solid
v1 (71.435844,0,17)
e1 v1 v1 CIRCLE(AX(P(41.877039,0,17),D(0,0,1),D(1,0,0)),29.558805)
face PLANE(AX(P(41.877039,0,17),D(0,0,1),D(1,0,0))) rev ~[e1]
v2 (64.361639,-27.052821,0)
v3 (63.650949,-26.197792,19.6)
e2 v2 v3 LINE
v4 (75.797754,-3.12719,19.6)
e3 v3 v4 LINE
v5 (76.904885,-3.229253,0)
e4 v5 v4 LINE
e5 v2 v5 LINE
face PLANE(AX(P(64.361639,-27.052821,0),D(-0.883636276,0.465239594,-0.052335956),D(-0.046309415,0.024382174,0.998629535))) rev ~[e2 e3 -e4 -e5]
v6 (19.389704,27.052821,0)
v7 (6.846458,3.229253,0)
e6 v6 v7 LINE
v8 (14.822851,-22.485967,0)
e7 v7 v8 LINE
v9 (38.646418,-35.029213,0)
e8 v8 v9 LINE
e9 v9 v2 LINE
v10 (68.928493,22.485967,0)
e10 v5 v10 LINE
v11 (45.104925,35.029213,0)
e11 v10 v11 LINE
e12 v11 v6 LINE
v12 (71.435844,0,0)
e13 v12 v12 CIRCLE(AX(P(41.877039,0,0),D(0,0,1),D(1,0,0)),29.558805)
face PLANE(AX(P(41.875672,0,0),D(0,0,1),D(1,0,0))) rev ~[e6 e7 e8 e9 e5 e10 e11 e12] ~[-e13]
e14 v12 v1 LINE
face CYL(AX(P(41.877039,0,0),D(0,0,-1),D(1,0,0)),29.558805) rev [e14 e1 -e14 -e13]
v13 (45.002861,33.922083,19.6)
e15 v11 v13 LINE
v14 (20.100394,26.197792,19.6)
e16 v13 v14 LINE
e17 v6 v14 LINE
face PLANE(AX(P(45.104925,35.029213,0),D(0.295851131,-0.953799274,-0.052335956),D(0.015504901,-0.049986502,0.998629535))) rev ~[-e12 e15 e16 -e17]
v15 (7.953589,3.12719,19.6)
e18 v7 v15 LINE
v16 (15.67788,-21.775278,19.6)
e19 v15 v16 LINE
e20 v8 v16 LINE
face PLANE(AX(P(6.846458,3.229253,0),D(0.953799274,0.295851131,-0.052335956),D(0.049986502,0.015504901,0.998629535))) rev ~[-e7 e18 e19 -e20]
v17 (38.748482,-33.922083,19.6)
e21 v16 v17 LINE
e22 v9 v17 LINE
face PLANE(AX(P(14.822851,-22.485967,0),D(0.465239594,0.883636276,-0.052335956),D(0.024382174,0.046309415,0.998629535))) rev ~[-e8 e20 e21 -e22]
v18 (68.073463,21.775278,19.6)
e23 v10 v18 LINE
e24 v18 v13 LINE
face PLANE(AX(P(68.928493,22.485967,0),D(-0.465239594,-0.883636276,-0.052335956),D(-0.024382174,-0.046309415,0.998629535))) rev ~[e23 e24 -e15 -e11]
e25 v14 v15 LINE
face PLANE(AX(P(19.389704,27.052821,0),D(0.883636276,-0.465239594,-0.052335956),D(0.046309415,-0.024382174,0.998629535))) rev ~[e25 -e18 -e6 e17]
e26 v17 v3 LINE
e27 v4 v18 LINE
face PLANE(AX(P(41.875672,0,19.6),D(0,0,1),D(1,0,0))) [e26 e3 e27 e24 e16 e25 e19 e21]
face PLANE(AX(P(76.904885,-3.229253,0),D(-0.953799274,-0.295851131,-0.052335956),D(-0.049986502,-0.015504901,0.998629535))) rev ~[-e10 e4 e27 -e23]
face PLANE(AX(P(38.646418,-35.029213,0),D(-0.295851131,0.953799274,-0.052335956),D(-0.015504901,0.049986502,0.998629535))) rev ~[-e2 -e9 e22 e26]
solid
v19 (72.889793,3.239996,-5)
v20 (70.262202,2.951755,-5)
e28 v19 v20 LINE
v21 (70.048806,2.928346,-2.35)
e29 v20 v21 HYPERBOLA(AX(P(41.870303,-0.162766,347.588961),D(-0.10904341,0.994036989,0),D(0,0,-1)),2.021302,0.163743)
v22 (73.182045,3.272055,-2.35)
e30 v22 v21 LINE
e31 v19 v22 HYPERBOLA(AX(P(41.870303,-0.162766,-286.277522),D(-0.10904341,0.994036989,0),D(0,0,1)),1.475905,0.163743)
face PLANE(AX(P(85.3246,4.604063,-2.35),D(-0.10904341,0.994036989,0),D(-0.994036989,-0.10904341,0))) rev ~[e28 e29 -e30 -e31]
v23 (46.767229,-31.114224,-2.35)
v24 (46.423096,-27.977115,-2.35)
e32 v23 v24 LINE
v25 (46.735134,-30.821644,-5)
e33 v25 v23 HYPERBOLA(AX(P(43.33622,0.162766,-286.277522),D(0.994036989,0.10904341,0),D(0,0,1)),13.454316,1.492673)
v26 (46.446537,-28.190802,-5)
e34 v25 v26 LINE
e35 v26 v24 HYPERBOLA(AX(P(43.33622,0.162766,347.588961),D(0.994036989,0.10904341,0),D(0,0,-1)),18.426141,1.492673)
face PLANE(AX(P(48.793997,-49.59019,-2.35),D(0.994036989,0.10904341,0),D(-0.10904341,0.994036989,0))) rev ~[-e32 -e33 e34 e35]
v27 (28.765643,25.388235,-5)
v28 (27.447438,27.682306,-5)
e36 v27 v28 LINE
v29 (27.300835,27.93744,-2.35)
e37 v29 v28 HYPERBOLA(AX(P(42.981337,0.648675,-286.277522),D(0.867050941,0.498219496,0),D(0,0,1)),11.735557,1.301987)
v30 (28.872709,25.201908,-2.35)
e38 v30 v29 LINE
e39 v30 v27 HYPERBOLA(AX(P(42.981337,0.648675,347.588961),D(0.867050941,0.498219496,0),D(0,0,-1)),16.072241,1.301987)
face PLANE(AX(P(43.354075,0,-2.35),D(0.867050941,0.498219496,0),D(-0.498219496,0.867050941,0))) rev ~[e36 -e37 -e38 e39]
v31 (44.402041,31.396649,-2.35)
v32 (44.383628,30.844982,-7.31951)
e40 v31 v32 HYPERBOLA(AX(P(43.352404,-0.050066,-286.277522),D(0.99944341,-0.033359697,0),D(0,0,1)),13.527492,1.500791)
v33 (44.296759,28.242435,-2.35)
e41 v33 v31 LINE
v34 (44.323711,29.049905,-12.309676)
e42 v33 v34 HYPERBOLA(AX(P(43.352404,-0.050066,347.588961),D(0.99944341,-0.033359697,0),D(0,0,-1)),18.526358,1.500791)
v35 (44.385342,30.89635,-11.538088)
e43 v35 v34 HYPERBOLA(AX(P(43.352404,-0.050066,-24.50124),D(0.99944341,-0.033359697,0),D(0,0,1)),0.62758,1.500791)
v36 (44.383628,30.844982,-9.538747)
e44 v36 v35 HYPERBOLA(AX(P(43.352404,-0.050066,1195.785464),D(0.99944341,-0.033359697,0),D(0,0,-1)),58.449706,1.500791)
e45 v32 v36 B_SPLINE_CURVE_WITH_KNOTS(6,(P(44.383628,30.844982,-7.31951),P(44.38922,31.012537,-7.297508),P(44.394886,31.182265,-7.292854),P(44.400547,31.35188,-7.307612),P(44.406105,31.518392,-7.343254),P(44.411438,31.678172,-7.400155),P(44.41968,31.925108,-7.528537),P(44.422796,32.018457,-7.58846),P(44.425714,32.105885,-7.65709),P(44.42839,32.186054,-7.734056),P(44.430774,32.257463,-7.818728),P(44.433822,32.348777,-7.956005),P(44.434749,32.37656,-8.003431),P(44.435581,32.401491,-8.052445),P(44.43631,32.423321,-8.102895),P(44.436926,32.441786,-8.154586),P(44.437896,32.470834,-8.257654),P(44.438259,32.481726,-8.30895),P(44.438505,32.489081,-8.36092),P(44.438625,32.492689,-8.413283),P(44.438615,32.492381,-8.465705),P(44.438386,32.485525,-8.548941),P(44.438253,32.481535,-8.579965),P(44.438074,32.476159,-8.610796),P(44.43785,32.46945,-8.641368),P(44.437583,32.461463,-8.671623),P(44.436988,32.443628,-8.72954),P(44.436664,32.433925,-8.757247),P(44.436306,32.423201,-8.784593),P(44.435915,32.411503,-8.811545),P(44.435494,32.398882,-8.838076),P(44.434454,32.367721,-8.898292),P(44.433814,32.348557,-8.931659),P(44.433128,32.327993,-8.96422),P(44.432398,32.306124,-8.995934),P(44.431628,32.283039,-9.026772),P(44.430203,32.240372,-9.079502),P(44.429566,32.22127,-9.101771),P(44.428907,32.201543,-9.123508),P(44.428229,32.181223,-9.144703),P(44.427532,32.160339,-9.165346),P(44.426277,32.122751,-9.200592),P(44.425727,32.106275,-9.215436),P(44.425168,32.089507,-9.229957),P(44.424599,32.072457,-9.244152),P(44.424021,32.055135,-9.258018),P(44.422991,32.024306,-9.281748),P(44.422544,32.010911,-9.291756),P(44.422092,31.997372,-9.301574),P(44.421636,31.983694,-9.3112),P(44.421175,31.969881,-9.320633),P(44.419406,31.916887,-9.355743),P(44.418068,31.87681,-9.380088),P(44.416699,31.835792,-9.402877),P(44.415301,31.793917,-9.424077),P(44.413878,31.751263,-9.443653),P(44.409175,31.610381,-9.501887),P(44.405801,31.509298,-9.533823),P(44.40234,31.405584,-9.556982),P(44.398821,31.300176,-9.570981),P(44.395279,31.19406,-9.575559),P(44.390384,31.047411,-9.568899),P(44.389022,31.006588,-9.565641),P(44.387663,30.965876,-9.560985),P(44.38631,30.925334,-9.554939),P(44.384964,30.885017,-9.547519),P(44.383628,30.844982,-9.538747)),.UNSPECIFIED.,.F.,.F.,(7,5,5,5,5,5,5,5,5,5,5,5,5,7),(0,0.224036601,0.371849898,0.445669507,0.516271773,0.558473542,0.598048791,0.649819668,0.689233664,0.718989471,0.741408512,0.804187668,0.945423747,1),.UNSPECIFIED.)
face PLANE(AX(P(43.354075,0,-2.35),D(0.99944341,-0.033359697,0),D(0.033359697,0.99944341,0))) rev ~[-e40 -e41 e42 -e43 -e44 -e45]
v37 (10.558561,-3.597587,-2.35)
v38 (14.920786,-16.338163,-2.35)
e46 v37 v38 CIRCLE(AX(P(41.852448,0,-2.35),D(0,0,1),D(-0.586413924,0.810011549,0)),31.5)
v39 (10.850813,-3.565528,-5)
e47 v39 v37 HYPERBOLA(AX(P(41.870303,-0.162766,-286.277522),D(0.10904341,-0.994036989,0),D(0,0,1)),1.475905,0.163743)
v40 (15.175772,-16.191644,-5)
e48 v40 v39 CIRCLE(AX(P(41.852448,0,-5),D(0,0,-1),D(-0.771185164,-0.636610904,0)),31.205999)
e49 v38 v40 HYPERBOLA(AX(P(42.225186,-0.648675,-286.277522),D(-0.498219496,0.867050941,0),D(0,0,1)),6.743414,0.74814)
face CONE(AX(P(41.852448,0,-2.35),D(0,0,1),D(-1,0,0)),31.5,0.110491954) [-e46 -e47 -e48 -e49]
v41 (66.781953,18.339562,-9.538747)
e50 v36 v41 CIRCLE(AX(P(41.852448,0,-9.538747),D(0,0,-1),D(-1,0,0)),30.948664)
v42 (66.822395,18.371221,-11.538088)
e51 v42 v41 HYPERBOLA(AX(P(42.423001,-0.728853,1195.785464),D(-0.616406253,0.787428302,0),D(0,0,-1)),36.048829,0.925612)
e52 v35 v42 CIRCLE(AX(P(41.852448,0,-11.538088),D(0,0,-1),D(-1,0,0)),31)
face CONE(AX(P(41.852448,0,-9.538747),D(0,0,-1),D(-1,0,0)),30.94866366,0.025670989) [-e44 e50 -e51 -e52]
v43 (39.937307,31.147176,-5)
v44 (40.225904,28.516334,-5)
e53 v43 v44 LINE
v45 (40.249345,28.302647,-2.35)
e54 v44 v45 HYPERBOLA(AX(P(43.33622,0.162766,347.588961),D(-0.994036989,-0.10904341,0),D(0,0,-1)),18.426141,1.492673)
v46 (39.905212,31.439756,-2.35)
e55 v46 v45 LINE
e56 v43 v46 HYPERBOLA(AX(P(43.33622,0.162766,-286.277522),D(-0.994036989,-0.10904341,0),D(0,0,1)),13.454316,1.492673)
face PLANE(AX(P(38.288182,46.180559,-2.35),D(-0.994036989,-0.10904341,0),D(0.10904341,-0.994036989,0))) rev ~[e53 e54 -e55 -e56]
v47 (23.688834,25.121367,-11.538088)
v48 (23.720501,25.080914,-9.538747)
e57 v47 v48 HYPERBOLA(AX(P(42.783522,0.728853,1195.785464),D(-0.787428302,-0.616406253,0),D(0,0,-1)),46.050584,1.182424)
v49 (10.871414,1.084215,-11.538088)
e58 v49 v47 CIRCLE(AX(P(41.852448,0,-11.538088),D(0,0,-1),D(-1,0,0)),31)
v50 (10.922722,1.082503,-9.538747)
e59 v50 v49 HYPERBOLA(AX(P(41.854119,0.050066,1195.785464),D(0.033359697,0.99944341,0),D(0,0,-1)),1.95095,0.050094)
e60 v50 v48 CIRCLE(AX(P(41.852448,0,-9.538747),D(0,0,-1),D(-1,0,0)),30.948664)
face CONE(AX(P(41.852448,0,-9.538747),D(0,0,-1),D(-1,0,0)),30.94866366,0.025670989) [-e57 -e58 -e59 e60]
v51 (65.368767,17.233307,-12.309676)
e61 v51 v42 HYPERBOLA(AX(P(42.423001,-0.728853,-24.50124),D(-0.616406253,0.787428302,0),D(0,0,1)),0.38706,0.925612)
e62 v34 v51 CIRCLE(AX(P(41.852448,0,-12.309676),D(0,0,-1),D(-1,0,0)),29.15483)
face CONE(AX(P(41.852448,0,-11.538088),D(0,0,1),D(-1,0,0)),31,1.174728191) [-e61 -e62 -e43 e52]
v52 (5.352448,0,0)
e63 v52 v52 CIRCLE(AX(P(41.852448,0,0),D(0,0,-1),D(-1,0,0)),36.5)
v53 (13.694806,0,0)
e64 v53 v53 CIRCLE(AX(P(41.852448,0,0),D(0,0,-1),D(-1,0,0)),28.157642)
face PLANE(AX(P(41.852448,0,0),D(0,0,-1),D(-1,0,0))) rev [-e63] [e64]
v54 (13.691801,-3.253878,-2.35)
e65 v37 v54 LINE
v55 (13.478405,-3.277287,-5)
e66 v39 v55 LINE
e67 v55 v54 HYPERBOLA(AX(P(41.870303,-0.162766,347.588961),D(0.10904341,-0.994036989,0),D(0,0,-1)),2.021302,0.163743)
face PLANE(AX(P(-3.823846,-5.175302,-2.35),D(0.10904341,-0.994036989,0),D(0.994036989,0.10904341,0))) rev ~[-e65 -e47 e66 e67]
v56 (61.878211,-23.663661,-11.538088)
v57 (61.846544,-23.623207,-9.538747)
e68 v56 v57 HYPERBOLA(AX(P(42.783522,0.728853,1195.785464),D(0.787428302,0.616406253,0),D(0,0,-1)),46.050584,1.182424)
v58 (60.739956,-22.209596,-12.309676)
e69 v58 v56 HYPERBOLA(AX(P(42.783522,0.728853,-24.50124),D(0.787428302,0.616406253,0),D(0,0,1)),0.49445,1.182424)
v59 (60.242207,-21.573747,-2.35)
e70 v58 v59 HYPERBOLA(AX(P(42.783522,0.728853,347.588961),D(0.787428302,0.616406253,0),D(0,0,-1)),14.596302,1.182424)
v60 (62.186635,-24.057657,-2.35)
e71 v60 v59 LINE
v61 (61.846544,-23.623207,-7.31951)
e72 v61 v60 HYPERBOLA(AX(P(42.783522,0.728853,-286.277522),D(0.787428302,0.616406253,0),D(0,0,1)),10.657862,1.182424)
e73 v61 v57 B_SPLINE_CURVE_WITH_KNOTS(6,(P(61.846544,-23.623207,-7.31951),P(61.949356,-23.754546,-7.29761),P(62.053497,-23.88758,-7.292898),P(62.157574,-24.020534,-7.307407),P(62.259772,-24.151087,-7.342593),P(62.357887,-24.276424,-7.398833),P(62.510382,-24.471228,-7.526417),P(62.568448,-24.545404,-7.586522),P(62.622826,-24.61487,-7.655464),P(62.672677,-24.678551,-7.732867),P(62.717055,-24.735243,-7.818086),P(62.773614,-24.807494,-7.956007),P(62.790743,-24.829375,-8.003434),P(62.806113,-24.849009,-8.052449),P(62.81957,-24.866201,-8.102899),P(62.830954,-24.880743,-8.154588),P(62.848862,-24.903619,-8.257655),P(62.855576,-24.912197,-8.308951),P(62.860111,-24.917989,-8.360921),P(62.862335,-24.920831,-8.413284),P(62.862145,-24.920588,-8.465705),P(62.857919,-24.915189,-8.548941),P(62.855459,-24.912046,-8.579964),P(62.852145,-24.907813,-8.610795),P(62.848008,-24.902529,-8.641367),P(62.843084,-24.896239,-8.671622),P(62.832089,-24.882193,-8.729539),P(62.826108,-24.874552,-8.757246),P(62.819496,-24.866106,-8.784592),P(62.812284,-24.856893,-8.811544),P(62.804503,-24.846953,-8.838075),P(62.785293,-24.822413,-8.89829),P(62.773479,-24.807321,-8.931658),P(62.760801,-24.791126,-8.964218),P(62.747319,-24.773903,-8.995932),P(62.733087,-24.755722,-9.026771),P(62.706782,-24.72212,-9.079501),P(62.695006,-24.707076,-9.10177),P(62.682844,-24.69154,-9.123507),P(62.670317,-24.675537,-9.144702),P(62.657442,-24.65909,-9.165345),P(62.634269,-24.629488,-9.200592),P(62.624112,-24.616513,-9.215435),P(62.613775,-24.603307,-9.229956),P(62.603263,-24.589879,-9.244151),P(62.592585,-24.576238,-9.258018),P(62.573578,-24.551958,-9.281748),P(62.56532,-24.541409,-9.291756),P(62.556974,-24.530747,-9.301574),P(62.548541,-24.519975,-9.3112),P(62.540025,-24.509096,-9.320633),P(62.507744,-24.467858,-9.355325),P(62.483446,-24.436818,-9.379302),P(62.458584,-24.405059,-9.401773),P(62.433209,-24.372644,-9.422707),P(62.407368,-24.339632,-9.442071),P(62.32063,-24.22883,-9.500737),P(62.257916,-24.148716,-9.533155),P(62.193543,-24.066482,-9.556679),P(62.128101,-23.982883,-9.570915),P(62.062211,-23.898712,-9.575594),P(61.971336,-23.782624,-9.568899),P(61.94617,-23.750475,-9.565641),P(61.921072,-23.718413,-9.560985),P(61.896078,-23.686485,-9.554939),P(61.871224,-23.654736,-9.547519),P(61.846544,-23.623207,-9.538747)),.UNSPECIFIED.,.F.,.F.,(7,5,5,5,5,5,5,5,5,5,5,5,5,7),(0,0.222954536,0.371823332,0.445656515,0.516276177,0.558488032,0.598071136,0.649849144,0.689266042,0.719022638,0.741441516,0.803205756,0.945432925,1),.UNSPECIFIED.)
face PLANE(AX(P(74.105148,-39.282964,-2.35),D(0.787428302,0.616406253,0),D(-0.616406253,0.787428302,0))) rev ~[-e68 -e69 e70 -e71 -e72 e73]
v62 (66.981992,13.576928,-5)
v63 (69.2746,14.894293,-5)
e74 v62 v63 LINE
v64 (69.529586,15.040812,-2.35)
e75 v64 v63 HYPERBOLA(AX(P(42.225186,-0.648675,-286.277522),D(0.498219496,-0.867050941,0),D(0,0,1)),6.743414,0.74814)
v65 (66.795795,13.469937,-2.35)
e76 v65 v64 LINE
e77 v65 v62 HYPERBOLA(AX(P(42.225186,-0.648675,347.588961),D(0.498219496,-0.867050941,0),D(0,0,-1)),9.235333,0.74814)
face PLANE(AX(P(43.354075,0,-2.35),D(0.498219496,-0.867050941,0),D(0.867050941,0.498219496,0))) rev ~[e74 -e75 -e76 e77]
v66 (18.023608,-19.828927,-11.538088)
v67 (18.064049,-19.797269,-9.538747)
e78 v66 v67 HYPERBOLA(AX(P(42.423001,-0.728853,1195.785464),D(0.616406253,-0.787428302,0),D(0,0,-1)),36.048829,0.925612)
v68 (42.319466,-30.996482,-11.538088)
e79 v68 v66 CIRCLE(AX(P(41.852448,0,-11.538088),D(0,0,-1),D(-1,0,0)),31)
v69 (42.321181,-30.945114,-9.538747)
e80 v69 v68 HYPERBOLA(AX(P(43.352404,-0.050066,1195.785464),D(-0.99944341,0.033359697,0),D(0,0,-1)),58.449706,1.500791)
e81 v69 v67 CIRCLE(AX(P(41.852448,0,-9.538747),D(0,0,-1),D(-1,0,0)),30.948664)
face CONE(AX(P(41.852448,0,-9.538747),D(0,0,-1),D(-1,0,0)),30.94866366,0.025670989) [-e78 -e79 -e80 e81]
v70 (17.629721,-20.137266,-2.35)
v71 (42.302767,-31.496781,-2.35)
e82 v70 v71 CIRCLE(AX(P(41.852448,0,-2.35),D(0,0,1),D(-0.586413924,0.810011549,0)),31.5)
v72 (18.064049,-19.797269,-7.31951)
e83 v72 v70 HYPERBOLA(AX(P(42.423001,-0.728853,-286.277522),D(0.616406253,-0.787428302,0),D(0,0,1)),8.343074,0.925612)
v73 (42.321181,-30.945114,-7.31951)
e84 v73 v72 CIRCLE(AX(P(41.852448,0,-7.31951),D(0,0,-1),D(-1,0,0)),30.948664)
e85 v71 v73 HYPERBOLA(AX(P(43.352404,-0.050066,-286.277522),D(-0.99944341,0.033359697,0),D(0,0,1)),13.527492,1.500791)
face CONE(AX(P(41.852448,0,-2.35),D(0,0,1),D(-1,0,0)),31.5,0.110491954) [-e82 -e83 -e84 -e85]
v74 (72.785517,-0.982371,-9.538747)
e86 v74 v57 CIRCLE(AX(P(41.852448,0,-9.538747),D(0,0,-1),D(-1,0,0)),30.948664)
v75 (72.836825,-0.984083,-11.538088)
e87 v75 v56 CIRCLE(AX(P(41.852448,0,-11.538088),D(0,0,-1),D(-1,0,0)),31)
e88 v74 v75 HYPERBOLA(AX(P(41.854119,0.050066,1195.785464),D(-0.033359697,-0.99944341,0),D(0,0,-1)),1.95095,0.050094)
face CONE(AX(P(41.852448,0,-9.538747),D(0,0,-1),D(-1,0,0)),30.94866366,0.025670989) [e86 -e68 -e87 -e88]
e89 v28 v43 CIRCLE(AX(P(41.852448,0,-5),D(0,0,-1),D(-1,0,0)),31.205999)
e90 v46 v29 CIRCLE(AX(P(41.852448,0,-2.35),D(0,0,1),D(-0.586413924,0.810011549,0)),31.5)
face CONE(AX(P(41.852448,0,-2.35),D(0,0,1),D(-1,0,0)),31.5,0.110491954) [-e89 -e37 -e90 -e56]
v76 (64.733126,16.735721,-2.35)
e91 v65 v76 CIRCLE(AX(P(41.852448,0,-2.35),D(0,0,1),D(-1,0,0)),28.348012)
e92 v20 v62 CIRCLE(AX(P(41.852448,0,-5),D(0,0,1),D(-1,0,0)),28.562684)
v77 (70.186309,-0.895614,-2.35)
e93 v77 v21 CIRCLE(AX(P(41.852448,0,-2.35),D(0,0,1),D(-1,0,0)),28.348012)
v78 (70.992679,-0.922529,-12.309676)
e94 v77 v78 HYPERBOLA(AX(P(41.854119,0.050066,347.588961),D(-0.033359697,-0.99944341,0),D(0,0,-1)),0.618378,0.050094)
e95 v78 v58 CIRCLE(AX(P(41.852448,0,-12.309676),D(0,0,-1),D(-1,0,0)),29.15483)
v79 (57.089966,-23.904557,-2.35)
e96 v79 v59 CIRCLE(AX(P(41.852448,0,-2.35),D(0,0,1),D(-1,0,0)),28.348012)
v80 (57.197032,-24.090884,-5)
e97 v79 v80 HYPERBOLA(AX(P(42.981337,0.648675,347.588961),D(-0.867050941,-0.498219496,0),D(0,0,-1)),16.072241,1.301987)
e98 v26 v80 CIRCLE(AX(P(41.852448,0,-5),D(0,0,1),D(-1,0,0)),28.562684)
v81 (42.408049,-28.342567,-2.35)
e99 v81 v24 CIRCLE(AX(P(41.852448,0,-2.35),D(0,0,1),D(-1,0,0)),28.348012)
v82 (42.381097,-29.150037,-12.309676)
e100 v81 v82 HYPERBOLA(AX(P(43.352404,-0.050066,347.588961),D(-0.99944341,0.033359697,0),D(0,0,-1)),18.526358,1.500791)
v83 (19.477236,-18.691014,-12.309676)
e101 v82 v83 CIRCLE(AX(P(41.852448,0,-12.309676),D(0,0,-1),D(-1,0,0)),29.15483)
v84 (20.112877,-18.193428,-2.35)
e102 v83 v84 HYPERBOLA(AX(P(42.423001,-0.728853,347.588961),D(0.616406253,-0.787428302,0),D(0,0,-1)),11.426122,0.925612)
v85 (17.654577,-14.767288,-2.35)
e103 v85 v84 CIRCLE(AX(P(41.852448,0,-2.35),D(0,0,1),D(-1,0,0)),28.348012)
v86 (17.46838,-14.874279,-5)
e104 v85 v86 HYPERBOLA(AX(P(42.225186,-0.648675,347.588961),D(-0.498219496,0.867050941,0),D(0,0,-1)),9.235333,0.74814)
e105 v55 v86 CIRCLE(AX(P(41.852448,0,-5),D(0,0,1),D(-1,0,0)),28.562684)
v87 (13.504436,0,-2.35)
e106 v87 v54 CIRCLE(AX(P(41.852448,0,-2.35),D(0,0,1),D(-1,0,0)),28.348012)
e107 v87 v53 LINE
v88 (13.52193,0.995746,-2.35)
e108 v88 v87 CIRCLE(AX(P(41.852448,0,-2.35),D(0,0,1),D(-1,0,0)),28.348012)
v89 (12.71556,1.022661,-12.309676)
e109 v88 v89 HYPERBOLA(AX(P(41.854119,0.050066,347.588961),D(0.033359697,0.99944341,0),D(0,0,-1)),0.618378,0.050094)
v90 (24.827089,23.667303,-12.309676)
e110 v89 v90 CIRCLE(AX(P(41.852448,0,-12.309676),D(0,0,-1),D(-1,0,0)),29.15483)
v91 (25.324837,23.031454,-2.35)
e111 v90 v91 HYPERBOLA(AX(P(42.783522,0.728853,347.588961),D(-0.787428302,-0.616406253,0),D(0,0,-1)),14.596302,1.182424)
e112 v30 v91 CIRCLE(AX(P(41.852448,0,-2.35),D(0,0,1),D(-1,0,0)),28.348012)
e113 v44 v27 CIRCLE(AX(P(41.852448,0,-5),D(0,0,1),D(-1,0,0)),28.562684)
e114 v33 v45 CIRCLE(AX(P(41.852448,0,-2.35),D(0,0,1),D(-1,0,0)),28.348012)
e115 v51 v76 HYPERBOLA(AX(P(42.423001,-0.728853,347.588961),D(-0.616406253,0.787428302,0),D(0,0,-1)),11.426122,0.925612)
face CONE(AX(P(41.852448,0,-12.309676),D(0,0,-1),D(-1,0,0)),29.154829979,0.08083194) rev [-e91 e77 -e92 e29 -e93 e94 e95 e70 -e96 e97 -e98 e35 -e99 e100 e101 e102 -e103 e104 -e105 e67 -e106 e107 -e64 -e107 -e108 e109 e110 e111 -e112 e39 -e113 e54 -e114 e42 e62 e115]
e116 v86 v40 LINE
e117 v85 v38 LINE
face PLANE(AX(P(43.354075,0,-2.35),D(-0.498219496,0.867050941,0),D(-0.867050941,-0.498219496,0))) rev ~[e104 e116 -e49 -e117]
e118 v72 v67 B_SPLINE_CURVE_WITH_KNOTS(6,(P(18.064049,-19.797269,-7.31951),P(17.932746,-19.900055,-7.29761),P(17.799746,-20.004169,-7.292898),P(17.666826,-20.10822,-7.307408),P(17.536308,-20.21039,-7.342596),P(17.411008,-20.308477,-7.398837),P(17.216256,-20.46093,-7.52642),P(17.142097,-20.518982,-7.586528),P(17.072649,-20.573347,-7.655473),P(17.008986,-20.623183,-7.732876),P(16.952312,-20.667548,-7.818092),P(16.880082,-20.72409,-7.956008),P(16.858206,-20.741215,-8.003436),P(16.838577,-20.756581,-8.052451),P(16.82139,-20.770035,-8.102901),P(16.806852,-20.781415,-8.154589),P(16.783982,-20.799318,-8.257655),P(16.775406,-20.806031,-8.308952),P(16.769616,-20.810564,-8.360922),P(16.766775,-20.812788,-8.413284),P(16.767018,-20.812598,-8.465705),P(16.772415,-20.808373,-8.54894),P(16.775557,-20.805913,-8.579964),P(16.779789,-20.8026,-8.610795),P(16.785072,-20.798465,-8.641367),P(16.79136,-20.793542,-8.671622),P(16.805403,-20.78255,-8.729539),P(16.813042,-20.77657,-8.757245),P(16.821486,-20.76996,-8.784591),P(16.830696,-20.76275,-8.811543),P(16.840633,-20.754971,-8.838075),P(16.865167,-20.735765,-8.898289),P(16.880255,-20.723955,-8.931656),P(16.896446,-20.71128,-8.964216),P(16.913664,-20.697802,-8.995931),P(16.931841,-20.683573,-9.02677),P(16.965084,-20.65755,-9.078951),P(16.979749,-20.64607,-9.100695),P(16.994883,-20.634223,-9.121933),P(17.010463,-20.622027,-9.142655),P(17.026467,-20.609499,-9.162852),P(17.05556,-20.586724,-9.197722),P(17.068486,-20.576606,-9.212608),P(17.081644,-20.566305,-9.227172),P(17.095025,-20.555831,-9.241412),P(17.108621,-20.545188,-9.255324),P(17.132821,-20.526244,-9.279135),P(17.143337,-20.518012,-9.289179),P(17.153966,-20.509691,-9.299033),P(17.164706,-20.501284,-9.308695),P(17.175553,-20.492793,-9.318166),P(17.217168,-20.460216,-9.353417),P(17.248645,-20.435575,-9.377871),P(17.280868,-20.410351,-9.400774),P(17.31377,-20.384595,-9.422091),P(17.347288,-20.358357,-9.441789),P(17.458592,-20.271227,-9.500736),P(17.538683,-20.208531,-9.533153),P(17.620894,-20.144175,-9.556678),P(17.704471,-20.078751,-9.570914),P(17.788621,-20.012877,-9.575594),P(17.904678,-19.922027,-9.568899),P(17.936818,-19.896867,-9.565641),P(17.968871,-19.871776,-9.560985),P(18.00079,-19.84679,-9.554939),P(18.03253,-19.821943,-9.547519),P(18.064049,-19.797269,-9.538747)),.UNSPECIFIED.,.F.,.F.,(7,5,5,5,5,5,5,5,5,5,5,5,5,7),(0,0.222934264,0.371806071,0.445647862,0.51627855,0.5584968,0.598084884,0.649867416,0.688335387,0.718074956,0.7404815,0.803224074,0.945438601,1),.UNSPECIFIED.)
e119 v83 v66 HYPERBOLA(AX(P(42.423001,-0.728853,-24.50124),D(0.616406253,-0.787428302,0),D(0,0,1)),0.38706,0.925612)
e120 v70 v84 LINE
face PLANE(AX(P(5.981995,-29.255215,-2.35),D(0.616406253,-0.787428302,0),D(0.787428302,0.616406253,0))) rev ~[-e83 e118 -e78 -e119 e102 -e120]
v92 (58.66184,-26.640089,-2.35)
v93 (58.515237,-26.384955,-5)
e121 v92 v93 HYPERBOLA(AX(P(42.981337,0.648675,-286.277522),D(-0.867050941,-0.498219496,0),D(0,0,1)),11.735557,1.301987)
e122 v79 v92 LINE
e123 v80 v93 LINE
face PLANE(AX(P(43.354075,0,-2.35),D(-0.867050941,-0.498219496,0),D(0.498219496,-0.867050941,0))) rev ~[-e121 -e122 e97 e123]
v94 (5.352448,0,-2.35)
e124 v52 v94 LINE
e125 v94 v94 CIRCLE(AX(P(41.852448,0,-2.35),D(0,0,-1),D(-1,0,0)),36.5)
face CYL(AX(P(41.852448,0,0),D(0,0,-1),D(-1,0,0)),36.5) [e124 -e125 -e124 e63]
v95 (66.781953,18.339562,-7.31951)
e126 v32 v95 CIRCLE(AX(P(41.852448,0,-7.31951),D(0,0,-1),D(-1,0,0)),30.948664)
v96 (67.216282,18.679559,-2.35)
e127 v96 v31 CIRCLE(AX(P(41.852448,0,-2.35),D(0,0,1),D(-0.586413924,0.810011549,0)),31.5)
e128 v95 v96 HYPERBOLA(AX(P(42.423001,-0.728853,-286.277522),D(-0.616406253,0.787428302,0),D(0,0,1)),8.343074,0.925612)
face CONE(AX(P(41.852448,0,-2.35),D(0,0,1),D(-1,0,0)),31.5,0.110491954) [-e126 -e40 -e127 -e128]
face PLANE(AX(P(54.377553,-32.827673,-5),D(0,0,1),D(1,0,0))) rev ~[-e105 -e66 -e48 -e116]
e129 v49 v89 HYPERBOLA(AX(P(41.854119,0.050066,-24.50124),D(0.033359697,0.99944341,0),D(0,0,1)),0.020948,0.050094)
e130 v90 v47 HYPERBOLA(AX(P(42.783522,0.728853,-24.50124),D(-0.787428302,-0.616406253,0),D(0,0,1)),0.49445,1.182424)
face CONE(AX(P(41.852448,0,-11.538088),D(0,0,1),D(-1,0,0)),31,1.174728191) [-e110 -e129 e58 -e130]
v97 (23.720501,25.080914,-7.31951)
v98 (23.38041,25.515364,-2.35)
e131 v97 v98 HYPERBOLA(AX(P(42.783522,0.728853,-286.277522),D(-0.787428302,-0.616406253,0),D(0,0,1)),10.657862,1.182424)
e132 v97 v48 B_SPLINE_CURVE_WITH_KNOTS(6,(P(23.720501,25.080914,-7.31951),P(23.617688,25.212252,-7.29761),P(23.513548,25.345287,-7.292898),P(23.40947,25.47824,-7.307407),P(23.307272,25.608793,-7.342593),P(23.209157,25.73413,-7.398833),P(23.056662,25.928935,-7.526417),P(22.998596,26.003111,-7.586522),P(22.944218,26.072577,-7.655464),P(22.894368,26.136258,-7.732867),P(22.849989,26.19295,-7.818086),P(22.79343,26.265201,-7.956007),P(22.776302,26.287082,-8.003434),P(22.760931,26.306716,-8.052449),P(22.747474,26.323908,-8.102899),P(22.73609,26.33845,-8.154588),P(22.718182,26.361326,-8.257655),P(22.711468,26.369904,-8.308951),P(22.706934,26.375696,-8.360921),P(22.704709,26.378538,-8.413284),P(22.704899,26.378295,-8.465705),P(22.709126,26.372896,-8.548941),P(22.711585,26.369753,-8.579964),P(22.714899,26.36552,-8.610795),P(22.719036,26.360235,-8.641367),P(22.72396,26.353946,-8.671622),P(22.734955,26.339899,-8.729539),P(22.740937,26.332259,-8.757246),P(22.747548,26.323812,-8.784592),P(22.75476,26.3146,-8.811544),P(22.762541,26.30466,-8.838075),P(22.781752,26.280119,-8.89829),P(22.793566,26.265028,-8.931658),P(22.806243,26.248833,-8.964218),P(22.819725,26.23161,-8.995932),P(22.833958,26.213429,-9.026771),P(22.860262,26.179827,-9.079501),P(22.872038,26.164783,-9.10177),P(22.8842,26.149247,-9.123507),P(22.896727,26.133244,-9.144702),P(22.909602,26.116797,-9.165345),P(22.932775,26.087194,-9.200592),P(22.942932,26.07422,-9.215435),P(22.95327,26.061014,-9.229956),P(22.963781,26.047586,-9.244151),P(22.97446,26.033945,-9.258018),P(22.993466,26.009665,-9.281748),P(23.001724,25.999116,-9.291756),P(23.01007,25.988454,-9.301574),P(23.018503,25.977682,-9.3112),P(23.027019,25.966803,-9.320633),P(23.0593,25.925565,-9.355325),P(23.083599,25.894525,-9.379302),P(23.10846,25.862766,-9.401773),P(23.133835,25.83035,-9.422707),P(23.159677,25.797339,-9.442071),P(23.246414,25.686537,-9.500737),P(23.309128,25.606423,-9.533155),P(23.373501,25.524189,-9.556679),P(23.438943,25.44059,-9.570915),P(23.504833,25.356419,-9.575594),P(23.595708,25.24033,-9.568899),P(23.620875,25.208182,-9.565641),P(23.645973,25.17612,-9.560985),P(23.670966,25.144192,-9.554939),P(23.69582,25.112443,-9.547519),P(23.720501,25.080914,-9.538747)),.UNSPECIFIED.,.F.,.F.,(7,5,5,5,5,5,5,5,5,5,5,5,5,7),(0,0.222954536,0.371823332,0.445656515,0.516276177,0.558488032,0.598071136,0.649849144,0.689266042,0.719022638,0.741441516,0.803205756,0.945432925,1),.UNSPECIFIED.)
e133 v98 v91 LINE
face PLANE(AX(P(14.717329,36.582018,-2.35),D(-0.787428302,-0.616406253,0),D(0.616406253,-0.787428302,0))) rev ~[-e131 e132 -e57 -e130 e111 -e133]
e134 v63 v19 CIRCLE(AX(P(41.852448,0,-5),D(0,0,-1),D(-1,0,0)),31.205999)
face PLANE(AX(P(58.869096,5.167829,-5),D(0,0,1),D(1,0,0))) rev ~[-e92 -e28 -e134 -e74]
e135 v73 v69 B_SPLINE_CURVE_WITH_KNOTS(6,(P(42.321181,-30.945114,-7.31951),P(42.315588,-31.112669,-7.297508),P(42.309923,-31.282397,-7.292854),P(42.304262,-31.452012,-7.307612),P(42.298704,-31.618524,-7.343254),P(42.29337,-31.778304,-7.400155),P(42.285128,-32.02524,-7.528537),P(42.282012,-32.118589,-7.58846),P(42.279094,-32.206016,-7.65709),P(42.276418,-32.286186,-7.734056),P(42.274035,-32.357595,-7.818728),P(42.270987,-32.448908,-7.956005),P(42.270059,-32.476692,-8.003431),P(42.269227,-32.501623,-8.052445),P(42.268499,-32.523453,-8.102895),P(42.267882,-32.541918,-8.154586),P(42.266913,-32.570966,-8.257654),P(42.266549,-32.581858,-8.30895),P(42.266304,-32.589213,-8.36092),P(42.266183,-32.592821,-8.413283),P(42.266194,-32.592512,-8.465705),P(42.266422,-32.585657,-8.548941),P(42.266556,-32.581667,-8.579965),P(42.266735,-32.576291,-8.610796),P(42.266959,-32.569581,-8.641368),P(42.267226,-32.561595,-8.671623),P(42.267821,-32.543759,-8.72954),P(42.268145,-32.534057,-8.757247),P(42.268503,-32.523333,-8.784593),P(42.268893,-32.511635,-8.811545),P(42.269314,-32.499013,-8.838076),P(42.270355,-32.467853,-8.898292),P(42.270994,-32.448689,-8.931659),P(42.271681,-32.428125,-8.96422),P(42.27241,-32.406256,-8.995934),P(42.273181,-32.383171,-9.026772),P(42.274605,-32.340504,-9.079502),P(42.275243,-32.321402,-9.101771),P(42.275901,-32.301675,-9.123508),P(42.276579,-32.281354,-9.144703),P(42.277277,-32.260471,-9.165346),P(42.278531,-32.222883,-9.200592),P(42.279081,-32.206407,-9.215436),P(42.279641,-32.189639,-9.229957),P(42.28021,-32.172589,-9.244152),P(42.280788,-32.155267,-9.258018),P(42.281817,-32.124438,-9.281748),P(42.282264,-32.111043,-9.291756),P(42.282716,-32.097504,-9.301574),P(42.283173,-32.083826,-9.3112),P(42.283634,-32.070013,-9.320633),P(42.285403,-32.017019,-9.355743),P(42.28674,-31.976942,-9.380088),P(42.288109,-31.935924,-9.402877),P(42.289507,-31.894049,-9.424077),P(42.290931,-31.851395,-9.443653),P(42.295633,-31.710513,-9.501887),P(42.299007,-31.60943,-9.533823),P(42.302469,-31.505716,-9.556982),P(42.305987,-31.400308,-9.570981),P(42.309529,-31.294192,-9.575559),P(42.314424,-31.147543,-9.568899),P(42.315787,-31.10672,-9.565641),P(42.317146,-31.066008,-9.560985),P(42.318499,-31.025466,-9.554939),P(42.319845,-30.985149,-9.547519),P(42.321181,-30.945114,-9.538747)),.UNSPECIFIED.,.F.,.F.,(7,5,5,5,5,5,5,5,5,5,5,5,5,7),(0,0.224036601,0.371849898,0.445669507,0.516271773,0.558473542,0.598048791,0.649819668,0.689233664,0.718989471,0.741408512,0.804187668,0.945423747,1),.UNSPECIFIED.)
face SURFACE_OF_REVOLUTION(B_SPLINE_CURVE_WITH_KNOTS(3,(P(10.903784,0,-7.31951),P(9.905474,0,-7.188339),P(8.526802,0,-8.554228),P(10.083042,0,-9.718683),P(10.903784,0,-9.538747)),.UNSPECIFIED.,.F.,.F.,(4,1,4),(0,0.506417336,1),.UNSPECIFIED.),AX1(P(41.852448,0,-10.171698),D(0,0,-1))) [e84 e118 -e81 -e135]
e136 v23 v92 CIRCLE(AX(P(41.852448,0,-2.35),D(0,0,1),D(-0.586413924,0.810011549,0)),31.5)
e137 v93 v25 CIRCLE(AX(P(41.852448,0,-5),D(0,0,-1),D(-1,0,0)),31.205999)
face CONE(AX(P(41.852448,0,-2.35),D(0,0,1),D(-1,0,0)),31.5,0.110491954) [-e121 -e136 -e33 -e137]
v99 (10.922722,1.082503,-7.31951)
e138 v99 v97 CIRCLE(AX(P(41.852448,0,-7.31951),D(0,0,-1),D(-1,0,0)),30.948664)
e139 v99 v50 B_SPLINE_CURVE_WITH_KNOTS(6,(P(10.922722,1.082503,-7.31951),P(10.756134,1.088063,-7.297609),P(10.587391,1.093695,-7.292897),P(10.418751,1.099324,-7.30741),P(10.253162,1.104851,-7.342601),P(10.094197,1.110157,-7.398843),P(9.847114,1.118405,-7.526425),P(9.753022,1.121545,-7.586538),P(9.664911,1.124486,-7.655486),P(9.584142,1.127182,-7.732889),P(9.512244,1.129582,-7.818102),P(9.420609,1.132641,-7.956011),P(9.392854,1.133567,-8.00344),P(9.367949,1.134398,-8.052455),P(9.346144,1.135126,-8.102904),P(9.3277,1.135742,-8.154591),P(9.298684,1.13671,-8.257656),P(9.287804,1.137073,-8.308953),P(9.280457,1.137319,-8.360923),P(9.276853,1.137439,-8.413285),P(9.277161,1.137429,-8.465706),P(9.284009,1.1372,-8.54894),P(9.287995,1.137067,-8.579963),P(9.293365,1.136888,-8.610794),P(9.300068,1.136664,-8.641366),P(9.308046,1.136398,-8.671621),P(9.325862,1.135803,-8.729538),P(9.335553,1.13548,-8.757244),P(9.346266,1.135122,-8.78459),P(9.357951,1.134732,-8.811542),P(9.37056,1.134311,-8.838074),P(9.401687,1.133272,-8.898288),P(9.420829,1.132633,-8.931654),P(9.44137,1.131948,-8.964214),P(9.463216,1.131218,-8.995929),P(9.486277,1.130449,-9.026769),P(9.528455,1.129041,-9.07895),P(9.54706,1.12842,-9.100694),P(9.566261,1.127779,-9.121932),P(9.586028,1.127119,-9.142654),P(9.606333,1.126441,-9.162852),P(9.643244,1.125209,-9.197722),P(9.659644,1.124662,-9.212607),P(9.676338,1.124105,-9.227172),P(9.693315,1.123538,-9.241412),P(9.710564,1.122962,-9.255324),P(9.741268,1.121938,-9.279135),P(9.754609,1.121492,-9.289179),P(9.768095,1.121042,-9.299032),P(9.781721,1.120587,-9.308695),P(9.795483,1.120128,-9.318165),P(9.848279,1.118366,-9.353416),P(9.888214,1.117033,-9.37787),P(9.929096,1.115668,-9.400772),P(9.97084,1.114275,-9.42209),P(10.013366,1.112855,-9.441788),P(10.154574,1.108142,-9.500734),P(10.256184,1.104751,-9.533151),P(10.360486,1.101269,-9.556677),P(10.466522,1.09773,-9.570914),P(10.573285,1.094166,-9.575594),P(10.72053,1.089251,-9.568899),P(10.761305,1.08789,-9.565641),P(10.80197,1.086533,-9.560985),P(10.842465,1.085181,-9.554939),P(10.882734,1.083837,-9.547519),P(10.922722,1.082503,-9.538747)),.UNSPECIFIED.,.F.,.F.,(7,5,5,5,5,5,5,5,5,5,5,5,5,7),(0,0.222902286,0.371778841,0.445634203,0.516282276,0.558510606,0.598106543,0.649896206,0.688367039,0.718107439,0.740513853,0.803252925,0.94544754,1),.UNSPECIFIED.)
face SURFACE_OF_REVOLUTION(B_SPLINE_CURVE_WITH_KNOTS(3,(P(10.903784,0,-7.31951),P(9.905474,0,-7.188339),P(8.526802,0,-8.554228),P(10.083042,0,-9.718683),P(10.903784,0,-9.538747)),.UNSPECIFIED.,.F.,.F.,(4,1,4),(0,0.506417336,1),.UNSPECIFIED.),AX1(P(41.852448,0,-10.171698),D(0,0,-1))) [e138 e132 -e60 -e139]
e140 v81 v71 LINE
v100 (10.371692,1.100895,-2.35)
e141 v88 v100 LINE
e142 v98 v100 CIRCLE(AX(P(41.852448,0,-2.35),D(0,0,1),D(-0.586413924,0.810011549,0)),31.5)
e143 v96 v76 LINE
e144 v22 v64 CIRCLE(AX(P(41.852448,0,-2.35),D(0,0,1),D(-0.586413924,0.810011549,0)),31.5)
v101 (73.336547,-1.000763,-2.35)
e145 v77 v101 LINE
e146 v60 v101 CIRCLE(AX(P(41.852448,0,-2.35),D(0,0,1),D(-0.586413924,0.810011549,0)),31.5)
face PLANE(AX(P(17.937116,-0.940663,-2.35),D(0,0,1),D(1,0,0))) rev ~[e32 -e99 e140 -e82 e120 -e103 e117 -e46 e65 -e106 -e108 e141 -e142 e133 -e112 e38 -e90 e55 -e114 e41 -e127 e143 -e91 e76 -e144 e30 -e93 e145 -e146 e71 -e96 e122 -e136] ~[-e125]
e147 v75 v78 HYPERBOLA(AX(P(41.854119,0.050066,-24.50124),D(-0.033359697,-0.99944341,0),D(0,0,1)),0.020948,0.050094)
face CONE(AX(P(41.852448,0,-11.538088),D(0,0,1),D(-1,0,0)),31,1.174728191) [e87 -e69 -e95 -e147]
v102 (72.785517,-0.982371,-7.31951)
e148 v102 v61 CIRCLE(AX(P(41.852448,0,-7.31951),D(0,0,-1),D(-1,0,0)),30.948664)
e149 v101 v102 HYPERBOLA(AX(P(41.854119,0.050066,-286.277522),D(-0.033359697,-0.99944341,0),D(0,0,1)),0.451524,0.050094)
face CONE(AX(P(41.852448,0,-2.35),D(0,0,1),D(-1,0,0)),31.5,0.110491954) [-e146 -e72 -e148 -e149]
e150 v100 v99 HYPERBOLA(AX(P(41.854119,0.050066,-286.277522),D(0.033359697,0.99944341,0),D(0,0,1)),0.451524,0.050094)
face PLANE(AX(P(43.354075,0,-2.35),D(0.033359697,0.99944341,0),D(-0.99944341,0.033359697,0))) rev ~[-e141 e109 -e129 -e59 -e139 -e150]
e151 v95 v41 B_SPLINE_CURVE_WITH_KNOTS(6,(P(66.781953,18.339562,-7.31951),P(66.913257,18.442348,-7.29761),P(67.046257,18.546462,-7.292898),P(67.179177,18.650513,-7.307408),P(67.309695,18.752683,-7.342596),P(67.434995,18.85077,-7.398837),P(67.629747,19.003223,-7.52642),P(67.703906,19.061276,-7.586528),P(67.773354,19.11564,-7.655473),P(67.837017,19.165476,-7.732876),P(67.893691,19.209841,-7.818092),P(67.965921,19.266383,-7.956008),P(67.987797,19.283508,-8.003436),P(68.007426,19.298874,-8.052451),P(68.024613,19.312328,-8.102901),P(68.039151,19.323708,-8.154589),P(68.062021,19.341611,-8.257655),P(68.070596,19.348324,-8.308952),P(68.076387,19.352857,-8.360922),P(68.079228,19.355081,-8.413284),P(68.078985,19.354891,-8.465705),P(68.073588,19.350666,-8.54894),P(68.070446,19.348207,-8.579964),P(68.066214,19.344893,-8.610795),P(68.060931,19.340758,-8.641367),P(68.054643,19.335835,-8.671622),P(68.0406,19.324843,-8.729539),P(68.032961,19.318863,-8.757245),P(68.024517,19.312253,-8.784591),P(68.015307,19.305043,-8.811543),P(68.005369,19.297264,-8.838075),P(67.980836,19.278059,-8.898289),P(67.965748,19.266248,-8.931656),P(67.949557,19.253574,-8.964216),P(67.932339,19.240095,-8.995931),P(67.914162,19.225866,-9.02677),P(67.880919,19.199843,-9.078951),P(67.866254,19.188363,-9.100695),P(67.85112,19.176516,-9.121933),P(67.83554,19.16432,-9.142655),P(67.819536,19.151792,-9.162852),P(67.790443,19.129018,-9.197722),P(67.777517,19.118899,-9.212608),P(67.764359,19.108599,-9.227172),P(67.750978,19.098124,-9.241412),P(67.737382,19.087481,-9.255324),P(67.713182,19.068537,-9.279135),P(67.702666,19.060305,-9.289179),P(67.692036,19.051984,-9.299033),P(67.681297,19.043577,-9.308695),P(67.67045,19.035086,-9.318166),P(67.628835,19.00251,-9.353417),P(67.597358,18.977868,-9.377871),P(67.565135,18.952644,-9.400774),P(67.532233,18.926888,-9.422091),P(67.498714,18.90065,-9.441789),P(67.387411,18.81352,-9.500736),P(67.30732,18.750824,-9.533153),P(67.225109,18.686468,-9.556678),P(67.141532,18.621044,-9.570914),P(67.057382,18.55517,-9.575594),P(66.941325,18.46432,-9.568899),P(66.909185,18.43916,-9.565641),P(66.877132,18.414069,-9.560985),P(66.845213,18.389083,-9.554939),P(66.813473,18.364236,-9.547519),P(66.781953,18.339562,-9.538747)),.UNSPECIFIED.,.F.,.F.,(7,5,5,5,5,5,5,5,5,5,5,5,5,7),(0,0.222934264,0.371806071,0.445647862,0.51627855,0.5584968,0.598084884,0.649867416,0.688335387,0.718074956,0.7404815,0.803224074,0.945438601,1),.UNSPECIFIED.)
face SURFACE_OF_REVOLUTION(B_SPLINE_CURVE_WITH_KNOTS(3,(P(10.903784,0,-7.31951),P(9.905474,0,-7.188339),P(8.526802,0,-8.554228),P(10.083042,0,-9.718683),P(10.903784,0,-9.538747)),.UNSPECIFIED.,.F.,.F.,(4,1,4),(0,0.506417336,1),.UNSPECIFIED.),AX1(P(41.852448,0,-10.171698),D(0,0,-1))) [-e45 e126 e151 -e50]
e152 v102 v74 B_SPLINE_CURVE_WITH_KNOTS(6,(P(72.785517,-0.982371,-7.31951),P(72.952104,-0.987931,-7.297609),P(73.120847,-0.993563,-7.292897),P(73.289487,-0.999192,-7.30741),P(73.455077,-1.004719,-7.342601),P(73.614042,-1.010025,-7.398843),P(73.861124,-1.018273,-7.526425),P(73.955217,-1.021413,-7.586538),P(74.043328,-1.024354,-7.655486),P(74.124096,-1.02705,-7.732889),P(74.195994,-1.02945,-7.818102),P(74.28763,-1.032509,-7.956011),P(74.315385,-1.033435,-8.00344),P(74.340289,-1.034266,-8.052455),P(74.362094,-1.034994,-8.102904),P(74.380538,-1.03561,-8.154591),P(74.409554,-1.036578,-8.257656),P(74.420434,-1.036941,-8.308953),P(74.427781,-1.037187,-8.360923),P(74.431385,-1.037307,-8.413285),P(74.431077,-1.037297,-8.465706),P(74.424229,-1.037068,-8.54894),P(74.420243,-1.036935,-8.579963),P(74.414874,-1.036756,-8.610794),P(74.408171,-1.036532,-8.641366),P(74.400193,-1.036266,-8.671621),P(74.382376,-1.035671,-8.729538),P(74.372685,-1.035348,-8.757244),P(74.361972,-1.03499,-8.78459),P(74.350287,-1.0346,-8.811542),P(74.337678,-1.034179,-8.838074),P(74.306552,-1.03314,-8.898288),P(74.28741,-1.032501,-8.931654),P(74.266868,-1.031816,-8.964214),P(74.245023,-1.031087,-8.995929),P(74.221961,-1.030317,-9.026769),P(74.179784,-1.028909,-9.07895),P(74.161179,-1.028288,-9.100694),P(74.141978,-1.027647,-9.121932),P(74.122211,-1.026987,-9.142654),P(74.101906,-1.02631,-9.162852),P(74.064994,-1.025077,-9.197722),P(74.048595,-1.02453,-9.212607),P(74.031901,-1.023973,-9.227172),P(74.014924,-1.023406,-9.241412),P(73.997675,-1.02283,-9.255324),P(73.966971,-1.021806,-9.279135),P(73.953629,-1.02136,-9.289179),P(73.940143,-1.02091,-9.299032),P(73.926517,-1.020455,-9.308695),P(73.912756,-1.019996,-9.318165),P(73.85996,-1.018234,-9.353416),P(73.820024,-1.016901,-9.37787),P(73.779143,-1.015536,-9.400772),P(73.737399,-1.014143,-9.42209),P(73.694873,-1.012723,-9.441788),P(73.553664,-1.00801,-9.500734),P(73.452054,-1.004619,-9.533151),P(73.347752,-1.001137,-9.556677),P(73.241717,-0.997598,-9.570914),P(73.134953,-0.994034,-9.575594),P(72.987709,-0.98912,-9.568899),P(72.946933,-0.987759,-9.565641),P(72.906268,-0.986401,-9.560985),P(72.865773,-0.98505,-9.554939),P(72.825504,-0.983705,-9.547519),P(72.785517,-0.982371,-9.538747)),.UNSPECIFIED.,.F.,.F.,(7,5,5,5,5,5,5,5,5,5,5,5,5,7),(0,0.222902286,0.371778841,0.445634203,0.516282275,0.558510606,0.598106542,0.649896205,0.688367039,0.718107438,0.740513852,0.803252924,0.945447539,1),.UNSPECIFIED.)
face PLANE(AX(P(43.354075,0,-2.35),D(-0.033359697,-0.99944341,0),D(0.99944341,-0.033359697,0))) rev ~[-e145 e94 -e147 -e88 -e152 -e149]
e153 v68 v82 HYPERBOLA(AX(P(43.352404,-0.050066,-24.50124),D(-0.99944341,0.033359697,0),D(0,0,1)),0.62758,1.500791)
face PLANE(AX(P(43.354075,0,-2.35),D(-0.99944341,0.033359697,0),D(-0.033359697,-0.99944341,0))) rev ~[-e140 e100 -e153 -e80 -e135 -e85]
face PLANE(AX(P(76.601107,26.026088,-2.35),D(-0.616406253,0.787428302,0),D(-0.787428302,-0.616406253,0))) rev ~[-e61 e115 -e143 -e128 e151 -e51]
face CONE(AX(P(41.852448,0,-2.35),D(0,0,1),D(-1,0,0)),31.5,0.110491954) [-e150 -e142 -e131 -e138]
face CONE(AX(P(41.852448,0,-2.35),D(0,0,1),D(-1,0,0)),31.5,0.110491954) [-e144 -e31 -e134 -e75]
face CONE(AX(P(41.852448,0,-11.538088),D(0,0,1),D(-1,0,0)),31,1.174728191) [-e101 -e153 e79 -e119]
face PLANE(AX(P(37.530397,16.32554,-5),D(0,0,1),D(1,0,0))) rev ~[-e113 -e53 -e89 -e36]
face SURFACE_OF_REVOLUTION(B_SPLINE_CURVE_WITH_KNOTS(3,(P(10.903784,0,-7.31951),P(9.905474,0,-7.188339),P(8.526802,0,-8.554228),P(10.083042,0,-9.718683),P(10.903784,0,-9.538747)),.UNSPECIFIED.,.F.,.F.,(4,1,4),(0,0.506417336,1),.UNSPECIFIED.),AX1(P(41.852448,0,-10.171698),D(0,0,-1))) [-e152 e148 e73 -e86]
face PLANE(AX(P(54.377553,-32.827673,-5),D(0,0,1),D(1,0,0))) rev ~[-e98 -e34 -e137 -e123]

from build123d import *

# Parameters (mm, degrees)
F1_DEPTH  = 19.6
F1_TAPER  = 3
F6_R      = 29.5588051004
F7_DEPTH  = 17
F10_START = -5
F10_DEPTH = 20
F13_DEPTH = 10


# Not quite as in the source:
# - the program builds the solid bodies; features that only make, move or delete a surface that nothing else refers to are left out


with BuildPart() as f1:
    # F0 (on Top) → F1 (new body)
    with BuildSketch(Plane.XY):
        Polygon((6.846458452, 3.2292531715), (14.8228506263, -22.4859673376), (38.6464184239, -35.0292131433), (64.3616389329, -27.052820969), (76.9048847387, -3.2292531715), (68.9284925643, 22.4859673376), (45.1049247668, 35.0292131433), (19.3897042578, 27.052820969), align=None)
    extrude(amount=F1_DEPTH, taper=F1_TAPER)

    # F6 (on Top) → F7 (cut)
    with BuildSketch(Plane.XY):
        with Locations((41.8770387769, 0)):
            Circle(F6_R)
    extrude(amount=F7_DEPTH, mode=Mode.SUBTRACT)


with BuildPart() as f5:
    # F4 (on Front) → F5 (revolve)
    with BuildSketch(Plane.XZ):
        with BuildLine():
            Line((12.6976181568, -12.3096757326), (13.6948058819, 0))
            Line((13.6948058819, 0), (10.6566109201, 0))
            Line((10.6566109201, 0), (5.3524481356, 0))
            Line((5.3524481356, 0), (5.3524481356, -2.35))
            Line((5.3524481356, -2.35), (10.3524481356, -2.35))
            Line((10.3524481356, -2.35), (10.9037844754, -7.3195098592))
            add(Edge.make_bspline(
                [(10.9037844754, -7.3195098592), (9.9054742604, -7.188339252), (8.526802396, -8.5542281967), (10.0830420852, -9.7186826169), (10.9037844754, -9.5387469869)],
                knots=[0, 0, 0, 0, 0.5064173363, 1, 1, 1, 1], degree=3))
            Line((10.9037844754, -9.5387469869), (10.8524481356, -11.5380880234))
            Line((10.8524481356, -11.5380880234), (12.6976181568, -12.3096757326))
        make_face()
    revolve(axis=Axis((41.8524481356, 0, -10.1716983277), (0, 0, -1)))


with BuildPart() as f10:
    # F9 (on Top) → F10 (new body)
    with BuildSketch(Plane.XY.offset(F10_START)):
        Polygon((42.6140986383, -43.1583486497), (69.8464736342, -34.131936729), (60.4310854986, -22.0097155725), (42.8283442474, -28.884228869), align=None)
        Polygon((42.8283442474, -28.884228869), (60.4310854986, -22.0097155725), (43.3466422396, -0.013660122), (43.260671187, -0.0804342567), align=None)
        Polygon((43.260671187, -0.0804342567), (43.3466422396, -0.013660122), (43.3372866763, -0.0016149246), (43.2618701985, -0.0005500774), align=None)
        Polygon((43.3372866763, -0.0016149246), (43.3466422396, -0.013660122), (43.3617063937, -0.0019597202), align=None)
        Polygon((43.2618701985, -0.0005500774), (43.3372866763, -0.0016149246), (43.2632842698, 0.093662458), align=None)
        Polygon((19.4793593917, -18.5514948023), (43.260671187, -0.0804342567), (43.2618701985, -0.0005500774), (43.2229116559, 0), (12.5911462439, 0.4803054209), align=None)
        Polygon((9.1356113553, -26.585534215), (19.4793593917, -18.5514948023), (12.5911462439, 0.4803054209), (0, 0.6777343224), align=None)
    extrude(amount=-F10_DEPTH)


with BuildPart() as f10b:
    # F9 (on Top) → F10, piece 2 (new body)
    with BuildSketch(Plane.XY.offset(F10_START)):
        Polygon((24.825832521, 23.8317032525), (43.2632842698, 0.093662458), (43.6881296354, 28.3989969936), align=None)
        Polygon((16.3248591125, 34.7766242921), (24.825832521, 23.8317032525), (43.6881296354, 28.3989969936), (43.9111739397, 43.2593300939), align=None)
    extrude(amount=-F10_DEPTH)


with BuildPart() as f10c:
    # F9 (on Top) → F10, piece 3 (new body)
    with BuildSketch(Plane.XY.offset(F10_START)):
        Polygon((65.2221173543, 16.9771278037), (43.3617063937, -0.0019597202), (71.1709585301, -0.3946140477), align=None)
        Polygon((79.0283353161, 27.7004844491), (65.2221173543, 16.9771278037), (71.1709585301, -0.3946140477), (86.5694135427, -0.6120334147), align=None)
    extrude(amount=-F10_DEPTH)


with BuildPart() as f5_1:
    add(f5.part)

    # F11: cut F10, F10c, F10b
    add(f10.part, mode=Mode.SUBTRACT)
    add(f10c.part, mode=Mode.SUBTRACT)
    add(f10b.part, mode=Mode.SUBTRACT)


with BuildPart() as f13:
    # F12 (on Top) → F13 (new body)
    with BuildSketch(Plane.XY):
        Polygon((81.2726734822, 21.7885523797), (76.6011070263, 26.0260878816), (43.354075402, 0), align=None)
    extrude(amount=-F13_DEPTH)


with BuildPart() as f13b:
    # F12 (on Top) → F13, piece 2 (new body)
    with BuildSketch(Plane.XY):
        Polygon((85.3246003462, 4.6040632222), (43.354075402, 0), (87.0625718818, -1.4589142), align=None)
    extrude(amount=-F13_DEPTH)


with BuildPart() as f13c:
    # F12 (on Top) → F13, piece 3 (new body)
    with BuildSketch(Plane.XY):
        Polygon((74.1051476533, -39.282963935), (43.354075402, 0), (69.7669919231, -45.9663748299), align=None)
    extrude(amount=-F13_DEPTH)


with BuildPart() as f13d:
    # F12 (on Top) → F13, piece 4 (new body)
    with BuildSketch(Plane.XY):
        Polygon((48.7939971237, -49.5901900761), (43.354075402, 0), (41.5855238111, -52.9851111108), align=None)
    extrude(amount=-F13_DEPTH)


with BuildPart() as f13e:
    # F12 (on Top) → F13, piece 5 (new body)
    with BuildSketch(Plane.XY):
        Polygon((5.9819950958, -29.2552146417), (43.354075402, 0), (1.6118744296, -23.9856476341), align=None)
    extrude(amount=-F13_DEPTH)


with BuildPart() as f13f:
    # F12 (on Top) → F13, piece 6 (new body)
    with BuildSketch(Plane.XY):
        Polygon((-3.8238455154, -5.1753017358), (43.354075402, 0), (-4.7618607516, 1.6060269319), align=None)
    extrude(amount=-F13_DEPTH)


with BuildPart() as f13g:
    # F12 (on Top) → F13, piece 7 (new body)
    with BuildSketch(Plane.XY):
        Polygon((14.7173287406, 36.5820182504), (43.354075402, 0), (20.0315345828, 40.5881967797), align=None)
    extrude(amount=-F13_DEPTH)


with BuildPart() as f13h:
    # F12 (on Top) → F13, piece 8 (new body)
    with BuildSketch(Plane.XY):
        Polygon((38.2881817991, 46.1805591199), (43.354075402, 0), (44.9157021402, 46.7857237843), align=None)
    extrude(amount=-F13_DEPTH)


with BuildPart() as f13g_1:
    # F14: moved
    add(f13g.part.moved(Location((0, 0, -2.35))))


with BuildPart() as f13f_1:
    # F14: moved
    add(f13f.part.moved(Location((0, 0, -2.35))))


with BuildPart() as f13e_1:
    # F14: moved
    add(f13e.part.moved(Location((0, 0, -2.35))))


with BuildPart() as f13d_1:
    # F14: moved
    add(f13d.part.moved(Location((0, 0, -2.35))))


with BuildPart() as f13c_1:
    # F14: moved
    add(f13c.part.moved(Location((0, 0, -2.35))))


with BuildPart() as f13b_1:
    # F14: moved
    add(f13b.part.moved(Location((0, 0, -2.35))))


with BuildPart() as f13_1:
    # F14: moved
    add(f13.part.moved(Location((0, 0, -2.35))))


with BuildPart() as f13h_1:
    # F14: moved
    add(f13h.part.moved(Location((0, 0, -2.35))))


with BuildPart() as f5_2:
    add(f5_1.part)

    # F15: cut F13g, F13f, F13e, F13d, F13c, F13b, F13, F13h
    add(f13g_1.part, mode=Mode.SUBTRACT)
    add(f13f_1.part, mode=Mode.SUBTRACT)
    add(f13e_1.part, mode=Mode.SUBTRACT)
    add(f13d_1.part, mode=Mode.SUBTRACT)
    add(f13c_1.part, mode=Mode.SUBTRACT)
    add(f13b_1.part, mode=Mode.SUBTRACT)
    add(f13_1.part, mode=Mode.SUBTRACT)
    add(f13h_1.part, mode=Mode.SUBTRACT)


solid = Compound([f1.part, f5_2.part])
